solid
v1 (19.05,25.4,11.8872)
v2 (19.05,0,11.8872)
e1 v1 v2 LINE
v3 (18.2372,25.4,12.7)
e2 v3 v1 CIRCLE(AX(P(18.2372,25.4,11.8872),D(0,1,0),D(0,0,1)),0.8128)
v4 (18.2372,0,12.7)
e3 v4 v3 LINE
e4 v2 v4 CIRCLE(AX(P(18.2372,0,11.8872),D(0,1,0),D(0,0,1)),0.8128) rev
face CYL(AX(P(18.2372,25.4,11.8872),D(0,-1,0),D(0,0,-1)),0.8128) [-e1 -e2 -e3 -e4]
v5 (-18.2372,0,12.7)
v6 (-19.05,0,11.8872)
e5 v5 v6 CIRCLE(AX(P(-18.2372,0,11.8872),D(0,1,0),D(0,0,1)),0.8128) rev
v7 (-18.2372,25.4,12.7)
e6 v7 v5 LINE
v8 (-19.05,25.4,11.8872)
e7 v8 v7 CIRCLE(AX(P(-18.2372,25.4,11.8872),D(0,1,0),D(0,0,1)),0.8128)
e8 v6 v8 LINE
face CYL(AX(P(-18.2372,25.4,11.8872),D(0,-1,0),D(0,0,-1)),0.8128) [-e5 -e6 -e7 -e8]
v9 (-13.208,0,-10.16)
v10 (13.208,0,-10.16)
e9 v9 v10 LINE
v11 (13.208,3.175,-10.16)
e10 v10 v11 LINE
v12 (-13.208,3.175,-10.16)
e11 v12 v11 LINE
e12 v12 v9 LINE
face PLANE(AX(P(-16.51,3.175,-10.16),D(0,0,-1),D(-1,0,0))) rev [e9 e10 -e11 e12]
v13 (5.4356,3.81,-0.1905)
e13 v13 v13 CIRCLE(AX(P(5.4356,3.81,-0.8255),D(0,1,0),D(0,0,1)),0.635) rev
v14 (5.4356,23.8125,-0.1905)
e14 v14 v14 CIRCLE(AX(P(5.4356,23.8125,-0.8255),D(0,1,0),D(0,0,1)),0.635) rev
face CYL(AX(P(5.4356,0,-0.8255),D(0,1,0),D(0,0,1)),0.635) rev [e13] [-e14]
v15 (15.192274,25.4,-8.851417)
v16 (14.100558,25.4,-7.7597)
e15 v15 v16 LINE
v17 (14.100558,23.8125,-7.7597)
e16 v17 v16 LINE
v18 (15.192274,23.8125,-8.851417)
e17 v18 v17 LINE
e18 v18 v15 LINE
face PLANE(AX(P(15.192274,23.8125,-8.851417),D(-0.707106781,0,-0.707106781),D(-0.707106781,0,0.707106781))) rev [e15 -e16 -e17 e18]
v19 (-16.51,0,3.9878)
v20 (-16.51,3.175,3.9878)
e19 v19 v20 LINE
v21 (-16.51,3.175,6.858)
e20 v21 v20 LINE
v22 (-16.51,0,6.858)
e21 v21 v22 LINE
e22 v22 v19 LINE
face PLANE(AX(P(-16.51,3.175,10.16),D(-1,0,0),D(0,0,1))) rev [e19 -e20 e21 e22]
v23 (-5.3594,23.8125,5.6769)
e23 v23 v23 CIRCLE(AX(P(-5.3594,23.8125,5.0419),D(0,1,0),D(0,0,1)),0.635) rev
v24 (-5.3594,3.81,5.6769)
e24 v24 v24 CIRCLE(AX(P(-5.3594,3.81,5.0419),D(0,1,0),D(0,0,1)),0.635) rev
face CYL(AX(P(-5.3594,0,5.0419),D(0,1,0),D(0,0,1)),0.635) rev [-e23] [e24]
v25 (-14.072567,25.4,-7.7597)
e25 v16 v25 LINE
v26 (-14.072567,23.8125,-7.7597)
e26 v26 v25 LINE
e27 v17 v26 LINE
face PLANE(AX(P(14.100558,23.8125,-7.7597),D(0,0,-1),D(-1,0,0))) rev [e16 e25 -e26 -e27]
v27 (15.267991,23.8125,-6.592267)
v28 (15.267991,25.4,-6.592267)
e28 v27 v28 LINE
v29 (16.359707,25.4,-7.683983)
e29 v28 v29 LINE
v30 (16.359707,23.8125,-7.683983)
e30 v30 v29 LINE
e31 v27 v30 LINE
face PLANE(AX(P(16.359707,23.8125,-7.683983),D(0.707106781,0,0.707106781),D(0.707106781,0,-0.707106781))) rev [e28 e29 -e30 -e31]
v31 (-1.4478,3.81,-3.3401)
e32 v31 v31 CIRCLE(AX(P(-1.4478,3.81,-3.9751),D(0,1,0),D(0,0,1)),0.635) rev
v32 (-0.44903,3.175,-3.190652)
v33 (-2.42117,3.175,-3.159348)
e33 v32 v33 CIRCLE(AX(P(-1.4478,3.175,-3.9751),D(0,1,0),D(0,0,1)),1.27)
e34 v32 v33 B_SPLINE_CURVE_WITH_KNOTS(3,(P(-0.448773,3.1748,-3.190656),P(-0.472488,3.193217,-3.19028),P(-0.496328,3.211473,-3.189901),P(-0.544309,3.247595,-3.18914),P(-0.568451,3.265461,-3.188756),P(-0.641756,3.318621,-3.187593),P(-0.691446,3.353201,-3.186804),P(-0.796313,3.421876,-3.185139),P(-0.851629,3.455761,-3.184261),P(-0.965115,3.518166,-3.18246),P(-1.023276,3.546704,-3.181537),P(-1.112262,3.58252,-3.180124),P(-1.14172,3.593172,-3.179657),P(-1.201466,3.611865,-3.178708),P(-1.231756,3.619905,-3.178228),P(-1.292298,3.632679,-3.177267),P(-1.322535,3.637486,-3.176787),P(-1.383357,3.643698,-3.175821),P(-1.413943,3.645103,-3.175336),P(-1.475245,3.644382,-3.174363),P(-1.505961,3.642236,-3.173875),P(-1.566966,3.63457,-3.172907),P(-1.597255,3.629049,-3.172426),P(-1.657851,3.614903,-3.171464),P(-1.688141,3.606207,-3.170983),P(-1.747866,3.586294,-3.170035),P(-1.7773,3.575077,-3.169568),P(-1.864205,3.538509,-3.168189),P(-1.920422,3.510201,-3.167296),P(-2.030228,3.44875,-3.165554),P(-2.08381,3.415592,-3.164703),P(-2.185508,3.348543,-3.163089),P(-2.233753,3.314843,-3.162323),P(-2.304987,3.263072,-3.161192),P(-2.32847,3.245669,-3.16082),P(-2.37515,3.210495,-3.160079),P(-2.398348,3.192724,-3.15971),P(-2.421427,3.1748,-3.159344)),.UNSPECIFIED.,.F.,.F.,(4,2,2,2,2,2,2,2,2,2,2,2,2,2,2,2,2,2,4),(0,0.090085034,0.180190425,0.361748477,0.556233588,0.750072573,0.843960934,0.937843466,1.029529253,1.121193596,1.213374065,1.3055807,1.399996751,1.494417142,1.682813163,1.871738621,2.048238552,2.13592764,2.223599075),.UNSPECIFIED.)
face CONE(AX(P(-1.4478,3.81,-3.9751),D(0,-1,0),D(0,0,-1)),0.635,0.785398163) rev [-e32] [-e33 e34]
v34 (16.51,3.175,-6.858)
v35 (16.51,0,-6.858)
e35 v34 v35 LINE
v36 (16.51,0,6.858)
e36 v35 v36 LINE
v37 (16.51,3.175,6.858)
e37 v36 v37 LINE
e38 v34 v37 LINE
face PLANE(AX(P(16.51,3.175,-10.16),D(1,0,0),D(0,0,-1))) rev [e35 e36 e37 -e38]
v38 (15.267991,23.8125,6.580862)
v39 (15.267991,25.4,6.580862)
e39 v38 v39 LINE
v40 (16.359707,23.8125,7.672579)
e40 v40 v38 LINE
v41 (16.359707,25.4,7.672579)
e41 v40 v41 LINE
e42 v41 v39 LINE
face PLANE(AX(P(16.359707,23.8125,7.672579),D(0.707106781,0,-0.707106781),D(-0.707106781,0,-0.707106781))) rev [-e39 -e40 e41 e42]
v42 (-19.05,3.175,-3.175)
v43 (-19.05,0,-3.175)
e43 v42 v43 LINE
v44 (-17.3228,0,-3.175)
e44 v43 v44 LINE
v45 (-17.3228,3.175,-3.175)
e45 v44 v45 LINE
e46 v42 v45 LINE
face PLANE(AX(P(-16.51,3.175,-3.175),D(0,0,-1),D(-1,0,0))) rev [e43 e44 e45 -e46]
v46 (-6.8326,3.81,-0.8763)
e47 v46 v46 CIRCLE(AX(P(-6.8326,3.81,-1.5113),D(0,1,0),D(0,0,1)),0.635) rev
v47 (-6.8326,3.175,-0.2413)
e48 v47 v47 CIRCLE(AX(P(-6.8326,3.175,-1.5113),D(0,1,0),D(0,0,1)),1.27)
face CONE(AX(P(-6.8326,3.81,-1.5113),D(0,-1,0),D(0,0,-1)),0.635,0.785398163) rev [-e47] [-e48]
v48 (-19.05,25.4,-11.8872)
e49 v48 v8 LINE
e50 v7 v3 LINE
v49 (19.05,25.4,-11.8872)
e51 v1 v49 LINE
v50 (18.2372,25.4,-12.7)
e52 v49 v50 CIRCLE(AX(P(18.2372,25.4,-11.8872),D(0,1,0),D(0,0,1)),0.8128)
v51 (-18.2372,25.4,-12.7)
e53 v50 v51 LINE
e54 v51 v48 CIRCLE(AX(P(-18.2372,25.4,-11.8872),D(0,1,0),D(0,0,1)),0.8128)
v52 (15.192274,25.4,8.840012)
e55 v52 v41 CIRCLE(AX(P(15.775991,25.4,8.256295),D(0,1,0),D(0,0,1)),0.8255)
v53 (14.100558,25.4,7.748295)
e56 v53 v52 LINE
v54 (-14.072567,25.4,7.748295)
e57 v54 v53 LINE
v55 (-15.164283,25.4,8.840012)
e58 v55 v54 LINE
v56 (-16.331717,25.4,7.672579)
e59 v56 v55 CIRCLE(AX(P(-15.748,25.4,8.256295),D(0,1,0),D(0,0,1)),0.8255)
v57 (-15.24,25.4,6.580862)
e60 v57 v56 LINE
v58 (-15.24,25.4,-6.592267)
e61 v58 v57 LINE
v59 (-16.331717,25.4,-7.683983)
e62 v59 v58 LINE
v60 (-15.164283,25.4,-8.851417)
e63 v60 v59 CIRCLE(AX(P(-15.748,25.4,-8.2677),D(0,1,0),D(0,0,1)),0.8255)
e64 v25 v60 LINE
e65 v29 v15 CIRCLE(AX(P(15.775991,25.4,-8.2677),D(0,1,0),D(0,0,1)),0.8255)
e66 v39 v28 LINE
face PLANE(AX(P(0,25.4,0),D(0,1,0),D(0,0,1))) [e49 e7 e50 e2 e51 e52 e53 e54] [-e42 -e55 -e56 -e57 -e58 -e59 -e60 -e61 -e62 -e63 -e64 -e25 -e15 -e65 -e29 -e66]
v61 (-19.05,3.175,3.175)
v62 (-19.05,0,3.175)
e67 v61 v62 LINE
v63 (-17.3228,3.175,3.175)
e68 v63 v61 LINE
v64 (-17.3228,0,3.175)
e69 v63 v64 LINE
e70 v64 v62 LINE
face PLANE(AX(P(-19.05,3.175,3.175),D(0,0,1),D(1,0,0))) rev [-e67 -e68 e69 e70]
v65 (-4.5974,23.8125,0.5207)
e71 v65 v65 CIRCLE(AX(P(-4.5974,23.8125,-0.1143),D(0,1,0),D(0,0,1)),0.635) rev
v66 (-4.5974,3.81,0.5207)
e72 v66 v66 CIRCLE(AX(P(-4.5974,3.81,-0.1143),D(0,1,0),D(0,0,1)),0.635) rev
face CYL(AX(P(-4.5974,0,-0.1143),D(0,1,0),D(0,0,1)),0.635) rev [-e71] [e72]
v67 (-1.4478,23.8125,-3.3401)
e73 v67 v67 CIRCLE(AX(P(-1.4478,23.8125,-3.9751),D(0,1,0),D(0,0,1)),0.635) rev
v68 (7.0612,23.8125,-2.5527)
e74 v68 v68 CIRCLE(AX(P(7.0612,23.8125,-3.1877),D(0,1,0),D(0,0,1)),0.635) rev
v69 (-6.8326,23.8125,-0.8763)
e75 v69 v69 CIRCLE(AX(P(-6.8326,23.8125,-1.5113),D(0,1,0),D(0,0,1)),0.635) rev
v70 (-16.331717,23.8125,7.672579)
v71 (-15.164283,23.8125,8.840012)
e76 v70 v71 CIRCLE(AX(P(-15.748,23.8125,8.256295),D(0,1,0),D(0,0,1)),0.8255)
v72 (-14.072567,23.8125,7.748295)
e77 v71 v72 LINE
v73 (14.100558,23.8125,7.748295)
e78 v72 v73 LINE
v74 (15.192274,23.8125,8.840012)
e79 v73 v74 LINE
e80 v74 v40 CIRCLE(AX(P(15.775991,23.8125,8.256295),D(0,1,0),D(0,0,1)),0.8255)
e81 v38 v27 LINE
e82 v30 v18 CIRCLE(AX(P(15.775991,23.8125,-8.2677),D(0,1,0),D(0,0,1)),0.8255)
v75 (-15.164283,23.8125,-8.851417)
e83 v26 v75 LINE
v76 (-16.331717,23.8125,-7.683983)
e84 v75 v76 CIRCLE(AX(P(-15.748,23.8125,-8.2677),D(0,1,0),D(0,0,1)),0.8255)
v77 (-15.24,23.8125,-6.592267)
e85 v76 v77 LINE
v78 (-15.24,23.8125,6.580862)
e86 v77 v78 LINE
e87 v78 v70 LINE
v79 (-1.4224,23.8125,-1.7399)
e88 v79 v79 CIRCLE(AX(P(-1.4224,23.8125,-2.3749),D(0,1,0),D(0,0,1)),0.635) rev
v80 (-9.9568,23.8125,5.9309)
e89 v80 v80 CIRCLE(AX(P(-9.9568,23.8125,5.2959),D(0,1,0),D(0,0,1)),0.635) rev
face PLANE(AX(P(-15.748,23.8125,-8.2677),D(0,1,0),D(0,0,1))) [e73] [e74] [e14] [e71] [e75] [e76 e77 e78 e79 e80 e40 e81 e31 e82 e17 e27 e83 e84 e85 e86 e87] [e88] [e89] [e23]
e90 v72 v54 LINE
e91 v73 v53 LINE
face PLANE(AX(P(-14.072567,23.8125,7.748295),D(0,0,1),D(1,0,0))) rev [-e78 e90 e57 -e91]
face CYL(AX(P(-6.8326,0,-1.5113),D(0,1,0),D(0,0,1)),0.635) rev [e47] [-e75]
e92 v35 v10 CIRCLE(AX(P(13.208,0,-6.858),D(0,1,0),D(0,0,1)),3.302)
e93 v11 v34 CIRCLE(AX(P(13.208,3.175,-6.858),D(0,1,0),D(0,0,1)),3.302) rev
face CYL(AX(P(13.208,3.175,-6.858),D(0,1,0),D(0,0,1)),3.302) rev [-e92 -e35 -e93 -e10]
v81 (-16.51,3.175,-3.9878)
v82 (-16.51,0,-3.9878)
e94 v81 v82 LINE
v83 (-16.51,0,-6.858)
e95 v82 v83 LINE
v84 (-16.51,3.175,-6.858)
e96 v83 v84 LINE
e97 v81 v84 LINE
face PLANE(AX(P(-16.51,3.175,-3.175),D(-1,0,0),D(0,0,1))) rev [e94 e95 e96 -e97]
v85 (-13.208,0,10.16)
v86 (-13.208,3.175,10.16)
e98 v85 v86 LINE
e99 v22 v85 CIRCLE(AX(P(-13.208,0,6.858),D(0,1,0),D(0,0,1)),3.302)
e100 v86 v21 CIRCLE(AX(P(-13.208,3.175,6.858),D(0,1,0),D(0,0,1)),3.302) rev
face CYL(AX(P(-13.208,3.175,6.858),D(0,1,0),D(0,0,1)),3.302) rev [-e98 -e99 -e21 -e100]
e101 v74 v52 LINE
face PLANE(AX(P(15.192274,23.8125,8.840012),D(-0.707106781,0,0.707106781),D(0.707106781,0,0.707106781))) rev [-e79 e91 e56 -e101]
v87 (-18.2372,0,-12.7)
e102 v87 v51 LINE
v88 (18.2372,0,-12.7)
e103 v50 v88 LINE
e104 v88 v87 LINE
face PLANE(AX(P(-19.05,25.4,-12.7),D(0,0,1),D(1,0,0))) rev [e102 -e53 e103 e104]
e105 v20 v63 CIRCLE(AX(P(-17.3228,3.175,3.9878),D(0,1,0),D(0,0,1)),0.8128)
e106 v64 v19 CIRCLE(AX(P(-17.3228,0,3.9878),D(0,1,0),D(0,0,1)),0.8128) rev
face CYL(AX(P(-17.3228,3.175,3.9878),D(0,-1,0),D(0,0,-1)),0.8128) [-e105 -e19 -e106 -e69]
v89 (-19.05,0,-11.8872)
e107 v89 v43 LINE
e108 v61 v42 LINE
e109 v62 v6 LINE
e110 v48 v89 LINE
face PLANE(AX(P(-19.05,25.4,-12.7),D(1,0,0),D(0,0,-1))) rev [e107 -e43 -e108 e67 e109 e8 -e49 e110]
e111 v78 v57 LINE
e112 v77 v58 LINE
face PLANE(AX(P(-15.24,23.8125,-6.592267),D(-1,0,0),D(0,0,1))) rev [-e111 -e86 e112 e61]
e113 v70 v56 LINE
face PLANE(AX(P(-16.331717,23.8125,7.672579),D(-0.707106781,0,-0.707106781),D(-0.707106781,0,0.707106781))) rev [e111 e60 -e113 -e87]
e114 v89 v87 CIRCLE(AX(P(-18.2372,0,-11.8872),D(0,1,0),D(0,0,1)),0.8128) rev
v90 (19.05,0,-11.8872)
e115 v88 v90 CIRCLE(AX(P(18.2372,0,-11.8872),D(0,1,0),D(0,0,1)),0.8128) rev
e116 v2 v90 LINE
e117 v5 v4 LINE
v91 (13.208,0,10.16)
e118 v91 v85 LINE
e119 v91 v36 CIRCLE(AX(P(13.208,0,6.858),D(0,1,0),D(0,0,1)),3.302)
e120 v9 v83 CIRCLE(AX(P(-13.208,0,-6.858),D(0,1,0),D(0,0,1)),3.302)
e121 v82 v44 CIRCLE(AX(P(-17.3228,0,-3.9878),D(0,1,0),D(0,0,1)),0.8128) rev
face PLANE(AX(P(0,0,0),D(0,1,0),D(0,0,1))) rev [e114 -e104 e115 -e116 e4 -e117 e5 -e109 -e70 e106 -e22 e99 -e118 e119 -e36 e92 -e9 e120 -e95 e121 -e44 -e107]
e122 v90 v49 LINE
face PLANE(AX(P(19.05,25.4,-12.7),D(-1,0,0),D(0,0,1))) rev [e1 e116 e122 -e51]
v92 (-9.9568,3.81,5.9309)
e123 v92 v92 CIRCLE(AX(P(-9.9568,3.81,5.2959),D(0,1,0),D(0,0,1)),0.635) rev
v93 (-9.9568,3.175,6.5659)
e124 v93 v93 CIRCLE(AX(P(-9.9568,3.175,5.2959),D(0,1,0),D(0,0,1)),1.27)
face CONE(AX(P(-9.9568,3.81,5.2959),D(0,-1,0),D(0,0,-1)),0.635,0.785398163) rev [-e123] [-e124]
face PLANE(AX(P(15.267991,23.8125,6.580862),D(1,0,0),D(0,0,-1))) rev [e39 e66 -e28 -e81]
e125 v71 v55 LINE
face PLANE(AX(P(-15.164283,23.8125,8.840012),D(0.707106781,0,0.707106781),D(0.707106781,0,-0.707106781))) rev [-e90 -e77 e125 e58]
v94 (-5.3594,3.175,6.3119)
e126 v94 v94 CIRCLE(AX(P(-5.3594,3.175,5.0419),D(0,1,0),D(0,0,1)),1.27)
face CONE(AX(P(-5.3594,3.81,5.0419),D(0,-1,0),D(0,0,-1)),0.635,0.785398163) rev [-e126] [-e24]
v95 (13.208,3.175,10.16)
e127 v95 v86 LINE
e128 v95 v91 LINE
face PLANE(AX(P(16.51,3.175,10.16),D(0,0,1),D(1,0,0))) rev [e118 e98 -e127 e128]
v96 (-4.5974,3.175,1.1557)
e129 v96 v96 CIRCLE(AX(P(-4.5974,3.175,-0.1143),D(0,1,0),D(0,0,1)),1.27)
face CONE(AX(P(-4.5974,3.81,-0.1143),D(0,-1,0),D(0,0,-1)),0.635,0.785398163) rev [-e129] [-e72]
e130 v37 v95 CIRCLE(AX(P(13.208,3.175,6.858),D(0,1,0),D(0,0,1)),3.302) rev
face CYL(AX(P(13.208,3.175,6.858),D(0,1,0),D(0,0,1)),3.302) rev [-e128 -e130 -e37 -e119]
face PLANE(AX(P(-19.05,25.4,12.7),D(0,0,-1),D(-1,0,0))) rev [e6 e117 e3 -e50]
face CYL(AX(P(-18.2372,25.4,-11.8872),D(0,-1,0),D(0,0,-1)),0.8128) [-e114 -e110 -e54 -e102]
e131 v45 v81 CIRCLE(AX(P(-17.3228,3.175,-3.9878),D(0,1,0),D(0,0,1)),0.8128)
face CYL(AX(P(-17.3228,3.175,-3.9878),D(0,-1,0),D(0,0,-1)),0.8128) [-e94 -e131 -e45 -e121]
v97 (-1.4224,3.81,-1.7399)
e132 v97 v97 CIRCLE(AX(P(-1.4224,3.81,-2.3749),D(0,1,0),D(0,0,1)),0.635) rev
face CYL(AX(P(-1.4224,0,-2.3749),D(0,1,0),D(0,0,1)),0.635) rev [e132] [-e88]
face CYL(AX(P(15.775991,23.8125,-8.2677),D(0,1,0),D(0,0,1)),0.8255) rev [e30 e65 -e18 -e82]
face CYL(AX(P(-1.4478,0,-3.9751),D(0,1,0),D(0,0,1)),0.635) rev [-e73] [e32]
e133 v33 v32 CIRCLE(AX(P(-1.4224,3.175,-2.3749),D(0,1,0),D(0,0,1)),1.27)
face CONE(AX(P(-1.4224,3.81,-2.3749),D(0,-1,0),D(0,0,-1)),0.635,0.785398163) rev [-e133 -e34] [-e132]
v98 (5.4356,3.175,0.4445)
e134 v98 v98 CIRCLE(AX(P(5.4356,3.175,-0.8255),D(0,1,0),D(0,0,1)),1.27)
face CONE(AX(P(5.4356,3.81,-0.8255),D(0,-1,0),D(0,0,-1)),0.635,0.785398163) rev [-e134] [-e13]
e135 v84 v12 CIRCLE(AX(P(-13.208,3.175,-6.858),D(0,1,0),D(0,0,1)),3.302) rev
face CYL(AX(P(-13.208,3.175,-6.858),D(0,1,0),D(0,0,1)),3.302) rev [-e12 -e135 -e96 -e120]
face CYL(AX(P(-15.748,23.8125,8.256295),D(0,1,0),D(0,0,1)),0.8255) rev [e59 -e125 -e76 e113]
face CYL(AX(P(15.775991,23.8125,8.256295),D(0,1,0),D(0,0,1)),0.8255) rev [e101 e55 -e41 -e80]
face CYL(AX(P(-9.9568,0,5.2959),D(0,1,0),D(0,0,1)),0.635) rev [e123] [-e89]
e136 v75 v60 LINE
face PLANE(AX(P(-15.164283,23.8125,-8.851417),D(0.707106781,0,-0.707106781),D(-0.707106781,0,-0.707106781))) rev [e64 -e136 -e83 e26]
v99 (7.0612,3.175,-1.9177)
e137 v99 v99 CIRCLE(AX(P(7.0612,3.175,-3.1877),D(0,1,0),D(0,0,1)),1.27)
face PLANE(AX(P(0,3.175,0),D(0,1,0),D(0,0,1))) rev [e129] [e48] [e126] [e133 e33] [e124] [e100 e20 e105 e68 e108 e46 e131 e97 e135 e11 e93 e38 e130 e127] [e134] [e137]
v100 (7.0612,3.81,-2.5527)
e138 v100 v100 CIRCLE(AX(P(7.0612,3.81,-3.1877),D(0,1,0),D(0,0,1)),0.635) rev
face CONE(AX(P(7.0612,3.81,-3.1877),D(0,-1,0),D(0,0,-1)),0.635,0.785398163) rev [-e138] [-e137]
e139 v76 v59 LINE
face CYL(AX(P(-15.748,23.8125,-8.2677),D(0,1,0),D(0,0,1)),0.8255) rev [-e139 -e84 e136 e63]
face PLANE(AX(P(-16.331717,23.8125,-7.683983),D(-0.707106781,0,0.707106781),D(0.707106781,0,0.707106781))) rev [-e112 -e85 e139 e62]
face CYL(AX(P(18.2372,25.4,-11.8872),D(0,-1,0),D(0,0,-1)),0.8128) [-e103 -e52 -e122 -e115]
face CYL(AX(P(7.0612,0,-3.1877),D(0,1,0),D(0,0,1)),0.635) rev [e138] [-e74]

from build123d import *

# Parameters (mm, degrees)
SKETCH1_W           = 38.1
SKETCH1_H           = 25.4
BOSS_EXTRUDE1_DEPTH = 25.4
SKETCH4_R           = 0.635
CUT_EXTRUDE1_DEPTH  = 35.195796525
CUT_EXTRUDE2_DEPTH  = 1.5875
CUT_EXTRUDE3_DEPTH  = 3.175
FILLET1_R           = 3.302
FILLET2_R           = 0.8128
CHAMFER1_SIZE       = 0.635


with BuildPart() as part:
    # Sketch1 → Boss-Extrude1 (new body)
    with BuildSketch(Plane(origin=(0, 0, 0), x_dir=(1, 0, 0), z_dir=(0, 1, 0))):
        Rectangle(SKETCH1_W, SKETCH1_H)
    extrude(amount=BOSS_EXTRUDE1_DEPTH)

    # Sketch4 → Cut-Extrude1 (cut, through all)
    with BuildSketch(Plane(origin=(0, 25.4, 0), x_dir=(1, 0, 0), z_dir=(0, 1, 0))):
        with Locations(Location((-9.9568, -5.2959, 0), (0, 0, 270))):
            Circle(SKETCH4_R)
        with Locations(Location((-5.3594, -5.0419, 0), (0, 0, 270))):
            Circle(SKETCH4_R)
        with Locations(Location((-4.5974, 0.1143, 0), (0, 0, 270))):
            Circle(SKETCH4_R)
        with Locations(Location((-6.8326, 1.5113, 0), (0, 0, 270))):
            Circle(SKETCH4_R)
        with Locations(Location((-1.4478, 3.9751, 0), (0, 0, 270))):
            Circle(SKETCH4_R)
        with Locations(Location((-1.4224, 2.3749, 0), (0, 0, 270))):
            Circle(SKETCH4_R)
        with Locations(Location((5.4356, 0.8255, 0), (0, 0, 270))):
            Circle(SKETCH4_R)
        with Locations(Location((7.0612, 3.1877, 0), (0, 0, 270))):
            Circle(SKETCH4_R)
    extrude(amount=-CUT_EXTRUDE1_DEPTH, mode=Mode.SUBTRACT)

    # Sketch5 → Cut-Extrude2 (cut)
    with BuildSketch(Plane(origin=(0, 25.4, 0), x_dir=(1, 0, 0), z_dir=(0, 1, 0))):
        with BuildLine():
            Line((-15.164283352, 8.851416648), (-14.072566704, 7.7597))
            Line((-14.072566704, 7.7597), (14.100557504, 7.7597))
            Line((14.100557504, 7.7597), (15.192274152, 8.851416648))
            ThreePointArc((15.192274152, 8.851416648), (16.359707448, 8.851416648), (16.359707448, 7.683983352))
            Line((16.359707448, 7.683983352), (15.2679908, 6.592266704))
            Line((15.2679908, 6.592266704), (15.2679908, -6.580862104))
            Line((15.2679908, -6.580862104), (16.359707448, -7.672578752))
            ThreePointArc((16.359707448, -7.672578752), (16.359707448, -8.840012048), (15.192274152, -8.840012048))
            Line((15.192274152, -8.840012048), (14.100557504, -7.7482954))
            Line((14.100557504, -7.7482954), (-14.072566704, -7.7482954))
            Line((-14.072566704, -7.7482954), (-15.164283352, -8.840012048))
            ThreePointArc((-15.164283352, -8.840012048), (-16.331716648, -8.840012048), (-16.331716648, -7.672578752))
            Line((-16.331716648, -7.672578752), (-15.24, -6.580862104))
            Line((-15.24, -6.580862104), (-15.24, 6.592266704))
            Line((-15.24, 6.592266704), (-16.331716648, 7.683983352))
            ThreePointArc((-16.331716648, 7.683983352), (-16.331716648, 8.851416648), (-15.164283352, 8.851416648))
        make_face()
    extrude(amount=-CUT_EXTRUDE2_DEPTH, mode=Mode.SUBTRACT)

    # Sketch6 → Cut-Extrude3 (cut)
    with BuildSketch(Plane.XZ):
        Polygon((-19.05, -3.175), (-19.05, 3.175), (-16.51, 3.175), (-16.51, 10.16), (16.51, 10.16), (16.51, -10.16), (-16.51, -10.16), (-16.51, -3.175), align=None)
    extrude(amount=-CUT_EXTRUDE3_DEPTH, mode=Mode.SUBTRACT)

    # Fillet1
    fillet1_edges = [part.edges().sort_by_distance(p)[0] for p in [
        (-16.51, 1.5875, 10.16),
        (16.51, 1.5875, 10.16),
        (16.51, 1.5875, -10.16),
        (-16.51, 1.5875, -10.16),
    ]]
    fillet(fillet1_edges, radius=FILLET1_R)

    # Fillet2
    fillet2_edges = [part.edges().sort_by_distance(p)[0] for p in [
        (-16.51, 1.5875, 3.175),
        (-16.51, 1.5875, -3.175),
        (-19.05, 12.7, -12.7),
        (19.05, 12.7, -12.7),
        (19.05, 12.7, 12.7),
        (-19.05, 12.7, 12.7),
    ]]
    fillet(fillet2_edges, radius=FILLET2_R)

    # Chamfer1
    # the kernel refuses this chamfer: 0.635 mm, written as the material it takes off along each edge
    with BuildSketch(Plane(origin=(-5.3594, 3.175, 5.0419), x_dir=(0, 0, 1), z_dir=(-1, 0, 0))) as chamfer1_piece_1:
        Polygon((0.635 + CHAMFER1_SIZE, 0), (0.635, CHAMFER1_SIZE), (0.635, 0), align=None)
    revolve(axis=Axis((-5.3594, 3.175, 5.0419), (0, 1, 0)), mode=Mode.SUBTRACT)
    with BuildSketch(Plane(origin=(-6.8326, 3.175, -1.5113), x_dir=(0, 0, 1), z_dir=(-1, 0, 0))) as chamfer1_piece_2:
        Polygon((0.635 + CHAMFER1_SIZE, 0), (0.635, CHAMFER1_SIZE), (0.635, 0), align=None)
    revolve(axis=Axis((-6.8326, 3.175, -1.5113), (0, 1, 0)), mode=Mode.SUBTRACT)
    with BuildSketch(Plane(origin=(-1.4224, 3.175, -2.3749), x_dir=(0, 0, 1), z_dir=(-1, 0, 0))) as chamfer1_piece_3:
        Polygon((0.635 + CHAMFER1_SIZE, 0), (0.635, CHAMFER1_SIZE), (0.635, 0), align=None)
    revolve(axis=Axis((-1.4224, 3.175, -2.3749), (0, 1, 0)), mode=Mode.SUBTRACT)
    with BuildSketch(Plane(origin=(7.0612, 3.175, -3.1877), x_dir=(0, 0, 1), z_dir=(-1, 0, 0))) as chamfer1_piece_4:
        Polygon((0.635 + CHAMFER1_SIZE, 0), (0.635, CHAMFER1_SIZE), (0.635, 0), align=None)
    revolve(axis=Axis((7.0612, 3.175, -3.1877), (0, 1, 0)), mode=Mode.SUBTRACT)
    with BuildSketch(Plane(origin=(5.4356, 3.175, -0.8255), x_dir=(0, 0, 1), z_dir=(-1, 0, 0))) as chamfer1_piece_5:
        Polygon((0.635 + CHAMFER1_SIZE, 0), (0.635, CHAMFER1_SIZE), (0.635, 0), align=None)
    revolve(axis=Axis((5.4356, 3.175, -0.8255), (0, 1, 0)), mode=Mode.SUBTRACT)
    with BuildSketch(Plane(origin=(-1.4478, 3.175, -3.9751), x_dir=(0, 0, 1), z_dir=(-1, 0, 0))) as chamfer1_piece_6:
        Polygon((0.635 + CHAMFER1_SIZE, 0), (0.635, CHAMFER1_SIZE), (0.635, 0), align=None)
    revolve(axis=Axis((-1.4478, 3.175, -3.9751), (0, 1, 0)), mode=Mode.SUBTRACT)
    with BuildSketch(Plane(origin=(-4.5974, 3.175, -0.1143), x_dir=(0, 0, 1), z_dir=(-1, 0, 0))) as chamfer1_piece_7:
        Polygon((0.635 + CHAMFER1_SIZE, 0), (0.635, CHAMFER1_SIZE), (0.635, 0), align=None)
    revolve(axis=Axis((-4.5974, 3.175, -0.1143), (0, 1, 0)), mode=Mode.SUBTRACT)
    with BuildSketch(Plane(origin=(-9.9568, 3.175, 5.2959), x_dir=(0, 0, 1), z_dir=(-1, 0, 0))) as chamfer1_piece_8:
        Polygon((0.635 + CHAMFER1_SIZE, 0), (0.635, CHAMFER1_SIZE), (0.635, 0), align=None)
    revolve(axis=Axis((-9.9568, 3.175, 5.2959), (0, 1, 0)), mode=Mode.SUBTRACT)


solid = part.part
